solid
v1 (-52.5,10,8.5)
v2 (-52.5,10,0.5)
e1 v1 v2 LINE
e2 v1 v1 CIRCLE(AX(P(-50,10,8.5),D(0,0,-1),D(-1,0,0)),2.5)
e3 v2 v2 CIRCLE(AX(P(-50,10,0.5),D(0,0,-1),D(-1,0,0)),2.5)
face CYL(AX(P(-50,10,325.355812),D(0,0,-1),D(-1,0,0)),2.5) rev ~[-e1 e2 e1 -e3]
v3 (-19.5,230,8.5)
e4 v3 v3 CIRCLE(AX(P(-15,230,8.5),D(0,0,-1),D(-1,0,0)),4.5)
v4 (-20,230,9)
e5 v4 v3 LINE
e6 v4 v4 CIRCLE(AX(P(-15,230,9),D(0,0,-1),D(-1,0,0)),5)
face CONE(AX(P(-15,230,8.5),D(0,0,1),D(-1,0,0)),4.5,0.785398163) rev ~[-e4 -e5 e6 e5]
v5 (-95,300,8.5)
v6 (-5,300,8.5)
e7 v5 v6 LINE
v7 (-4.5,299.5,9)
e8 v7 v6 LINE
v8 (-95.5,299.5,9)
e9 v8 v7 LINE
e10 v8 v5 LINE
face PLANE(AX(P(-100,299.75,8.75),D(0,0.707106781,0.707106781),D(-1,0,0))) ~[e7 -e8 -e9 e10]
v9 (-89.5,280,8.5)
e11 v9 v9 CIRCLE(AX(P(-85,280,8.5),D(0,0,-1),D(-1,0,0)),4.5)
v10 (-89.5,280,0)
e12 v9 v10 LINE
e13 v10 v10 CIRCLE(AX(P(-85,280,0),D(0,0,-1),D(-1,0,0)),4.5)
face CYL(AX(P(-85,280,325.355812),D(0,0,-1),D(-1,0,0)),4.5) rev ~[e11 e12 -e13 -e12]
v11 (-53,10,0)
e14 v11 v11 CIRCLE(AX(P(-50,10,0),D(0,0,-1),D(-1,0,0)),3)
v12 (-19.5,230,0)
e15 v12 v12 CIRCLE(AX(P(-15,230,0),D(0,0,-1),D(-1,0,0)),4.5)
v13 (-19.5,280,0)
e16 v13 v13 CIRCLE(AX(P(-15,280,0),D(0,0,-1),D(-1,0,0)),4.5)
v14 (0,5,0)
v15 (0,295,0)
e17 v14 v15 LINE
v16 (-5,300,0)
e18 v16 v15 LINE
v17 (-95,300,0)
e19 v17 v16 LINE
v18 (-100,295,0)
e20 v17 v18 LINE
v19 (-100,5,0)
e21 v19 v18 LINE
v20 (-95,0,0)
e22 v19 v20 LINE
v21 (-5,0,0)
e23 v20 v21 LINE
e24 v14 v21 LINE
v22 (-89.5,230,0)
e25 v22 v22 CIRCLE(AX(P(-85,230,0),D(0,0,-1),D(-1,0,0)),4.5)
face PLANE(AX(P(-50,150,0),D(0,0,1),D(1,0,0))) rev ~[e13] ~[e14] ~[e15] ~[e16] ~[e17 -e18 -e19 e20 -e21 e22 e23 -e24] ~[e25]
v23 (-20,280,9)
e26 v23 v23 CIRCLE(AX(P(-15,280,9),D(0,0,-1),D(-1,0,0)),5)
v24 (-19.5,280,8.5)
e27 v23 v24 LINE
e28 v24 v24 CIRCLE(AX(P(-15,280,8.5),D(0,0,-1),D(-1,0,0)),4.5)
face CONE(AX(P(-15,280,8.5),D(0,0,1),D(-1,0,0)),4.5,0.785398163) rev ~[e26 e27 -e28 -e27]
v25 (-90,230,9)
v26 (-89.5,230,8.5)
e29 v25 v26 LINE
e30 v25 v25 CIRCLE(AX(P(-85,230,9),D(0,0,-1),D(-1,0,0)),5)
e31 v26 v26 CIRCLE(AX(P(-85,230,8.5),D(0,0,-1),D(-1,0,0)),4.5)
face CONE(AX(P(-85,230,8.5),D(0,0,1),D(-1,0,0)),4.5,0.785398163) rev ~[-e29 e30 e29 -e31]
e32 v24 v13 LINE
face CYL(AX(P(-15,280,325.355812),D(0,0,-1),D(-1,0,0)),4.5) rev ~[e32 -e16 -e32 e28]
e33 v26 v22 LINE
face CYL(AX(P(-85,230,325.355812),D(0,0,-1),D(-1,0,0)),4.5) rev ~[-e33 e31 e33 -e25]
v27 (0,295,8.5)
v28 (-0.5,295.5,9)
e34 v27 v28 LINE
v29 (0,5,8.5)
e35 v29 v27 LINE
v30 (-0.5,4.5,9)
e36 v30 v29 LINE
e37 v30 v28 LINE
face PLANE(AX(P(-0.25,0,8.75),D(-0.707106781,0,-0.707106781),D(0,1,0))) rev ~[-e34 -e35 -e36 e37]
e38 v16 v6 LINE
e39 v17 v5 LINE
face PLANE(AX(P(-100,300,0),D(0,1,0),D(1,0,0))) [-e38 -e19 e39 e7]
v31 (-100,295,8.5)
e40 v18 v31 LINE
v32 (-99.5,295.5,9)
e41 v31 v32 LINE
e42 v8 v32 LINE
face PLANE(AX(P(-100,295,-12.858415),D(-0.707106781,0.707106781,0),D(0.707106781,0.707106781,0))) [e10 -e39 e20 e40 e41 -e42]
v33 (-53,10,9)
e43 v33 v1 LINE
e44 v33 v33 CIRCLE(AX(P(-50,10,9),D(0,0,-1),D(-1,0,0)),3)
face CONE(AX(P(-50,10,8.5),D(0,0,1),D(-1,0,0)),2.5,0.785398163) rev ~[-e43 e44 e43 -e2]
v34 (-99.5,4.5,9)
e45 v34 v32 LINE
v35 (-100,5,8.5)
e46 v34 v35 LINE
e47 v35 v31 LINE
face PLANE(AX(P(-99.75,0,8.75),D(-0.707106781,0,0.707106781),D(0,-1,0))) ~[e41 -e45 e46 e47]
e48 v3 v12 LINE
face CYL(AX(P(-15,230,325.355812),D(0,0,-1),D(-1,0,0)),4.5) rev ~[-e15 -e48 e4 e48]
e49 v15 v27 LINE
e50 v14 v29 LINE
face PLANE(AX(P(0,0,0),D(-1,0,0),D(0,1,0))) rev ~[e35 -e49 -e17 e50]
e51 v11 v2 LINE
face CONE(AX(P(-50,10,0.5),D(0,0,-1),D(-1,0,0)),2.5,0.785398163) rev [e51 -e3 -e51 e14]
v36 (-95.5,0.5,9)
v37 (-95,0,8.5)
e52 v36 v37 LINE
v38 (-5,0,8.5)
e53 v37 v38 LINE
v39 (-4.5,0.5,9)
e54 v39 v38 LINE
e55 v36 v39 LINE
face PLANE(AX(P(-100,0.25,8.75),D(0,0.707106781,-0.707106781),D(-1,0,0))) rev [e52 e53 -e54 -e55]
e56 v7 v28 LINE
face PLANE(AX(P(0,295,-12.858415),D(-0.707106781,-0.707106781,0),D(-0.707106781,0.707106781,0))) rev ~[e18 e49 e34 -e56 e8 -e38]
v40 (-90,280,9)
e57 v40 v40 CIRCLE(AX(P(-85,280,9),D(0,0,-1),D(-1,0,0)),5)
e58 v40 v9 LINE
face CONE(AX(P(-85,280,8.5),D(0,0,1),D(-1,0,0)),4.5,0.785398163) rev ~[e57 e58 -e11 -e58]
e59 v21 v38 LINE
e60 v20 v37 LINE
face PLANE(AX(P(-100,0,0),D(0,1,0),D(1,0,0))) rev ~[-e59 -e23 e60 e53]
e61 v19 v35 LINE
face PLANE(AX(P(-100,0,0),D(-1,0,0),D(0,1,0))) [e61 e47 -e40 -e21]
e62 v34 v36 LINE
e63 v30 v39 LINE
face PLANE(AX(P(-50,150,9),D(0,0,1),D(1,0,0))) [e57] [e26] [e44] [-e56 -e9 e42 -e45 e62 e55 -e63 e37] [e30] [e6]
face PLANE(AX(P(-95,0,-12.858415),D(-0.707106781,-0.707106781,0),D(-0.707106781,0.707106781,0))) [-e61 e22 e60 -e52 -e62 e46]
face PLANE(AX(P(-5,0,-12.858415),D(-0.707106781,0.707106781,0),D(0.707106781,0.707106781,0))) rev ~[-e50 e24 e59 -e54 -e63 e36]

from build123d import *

# Parameters (mm, degrees)
F0_W        = 100
F0_H        = 300
F1_DEPTH    = 9
F3_D        = 9
F5_D        = 5
F6_SIZE     = 0.5
F7_T1_DEPTH = 34.2168298797


# Not quite as in the source:
# - a fillet or chamfer that OpenCascade refuses, or shapes differently, is made with other operations: its cross-section is extruded or revolved along the edge and cut away or added


with BuildPart() as f1:
    # F0 (on Top) → F1 (new body)
    with BuildSketch(Plane.XY):
        with Locations((-50, 150)):
            Rectangle(F0_W, F0_H)
    extrude(amount=F1_DEPTH)

    # F3 (through all)
    with Locations(Plane.XY.offset(9)):
        with Locations((-85, 280), (-15, 280), (-15, 230), (-85, 230)):
            Hole(F3_D / 2)

    # F5 (through all)
    with Locations(Plane.XY.offset(9)):
        with Locations((-50, 10)):
            Hole(F5_D / 2)

    # F6
    f6_edges = [f1.edges().sort_by_distance(p)[0] for p in [
        (-50, 0, 9),
        (-100, 150, 9),
        (0, 150, 9),
        (-50, 300, 9),
        (-52.5, 10, 9),
        (-89.5, 230, 9),
        (-89.5, 280, 9),
        (-19.5, 230, 9),
        (-19.5, 280, 9),
        (-52.5, 10, 0),
    ]]
    chamfer(f6_edges, length=F6_SIZE)

    # F7: chamfer of 5 on 4 edges, made by hand

    # F7_s2 → F7_t1 (cut)
    with BuildSketch(Plane.XY.offset(-12.8584149398)):
        Polygon((-95, 0), (-100, 5), (-100, 0), align=None)
        Polygon((-5, 0), (0, 5), (0, 0), align=None)
        Polygon((-100, 295), (-95, 300), (-100, 300), align=None)
        Polygon((0, 295), (-5, 300), (0, 300), align=None)
    extrude(amount=F7_T1_DEPTH, mode=Mode.SUBTRACT)


solid = f1.part
